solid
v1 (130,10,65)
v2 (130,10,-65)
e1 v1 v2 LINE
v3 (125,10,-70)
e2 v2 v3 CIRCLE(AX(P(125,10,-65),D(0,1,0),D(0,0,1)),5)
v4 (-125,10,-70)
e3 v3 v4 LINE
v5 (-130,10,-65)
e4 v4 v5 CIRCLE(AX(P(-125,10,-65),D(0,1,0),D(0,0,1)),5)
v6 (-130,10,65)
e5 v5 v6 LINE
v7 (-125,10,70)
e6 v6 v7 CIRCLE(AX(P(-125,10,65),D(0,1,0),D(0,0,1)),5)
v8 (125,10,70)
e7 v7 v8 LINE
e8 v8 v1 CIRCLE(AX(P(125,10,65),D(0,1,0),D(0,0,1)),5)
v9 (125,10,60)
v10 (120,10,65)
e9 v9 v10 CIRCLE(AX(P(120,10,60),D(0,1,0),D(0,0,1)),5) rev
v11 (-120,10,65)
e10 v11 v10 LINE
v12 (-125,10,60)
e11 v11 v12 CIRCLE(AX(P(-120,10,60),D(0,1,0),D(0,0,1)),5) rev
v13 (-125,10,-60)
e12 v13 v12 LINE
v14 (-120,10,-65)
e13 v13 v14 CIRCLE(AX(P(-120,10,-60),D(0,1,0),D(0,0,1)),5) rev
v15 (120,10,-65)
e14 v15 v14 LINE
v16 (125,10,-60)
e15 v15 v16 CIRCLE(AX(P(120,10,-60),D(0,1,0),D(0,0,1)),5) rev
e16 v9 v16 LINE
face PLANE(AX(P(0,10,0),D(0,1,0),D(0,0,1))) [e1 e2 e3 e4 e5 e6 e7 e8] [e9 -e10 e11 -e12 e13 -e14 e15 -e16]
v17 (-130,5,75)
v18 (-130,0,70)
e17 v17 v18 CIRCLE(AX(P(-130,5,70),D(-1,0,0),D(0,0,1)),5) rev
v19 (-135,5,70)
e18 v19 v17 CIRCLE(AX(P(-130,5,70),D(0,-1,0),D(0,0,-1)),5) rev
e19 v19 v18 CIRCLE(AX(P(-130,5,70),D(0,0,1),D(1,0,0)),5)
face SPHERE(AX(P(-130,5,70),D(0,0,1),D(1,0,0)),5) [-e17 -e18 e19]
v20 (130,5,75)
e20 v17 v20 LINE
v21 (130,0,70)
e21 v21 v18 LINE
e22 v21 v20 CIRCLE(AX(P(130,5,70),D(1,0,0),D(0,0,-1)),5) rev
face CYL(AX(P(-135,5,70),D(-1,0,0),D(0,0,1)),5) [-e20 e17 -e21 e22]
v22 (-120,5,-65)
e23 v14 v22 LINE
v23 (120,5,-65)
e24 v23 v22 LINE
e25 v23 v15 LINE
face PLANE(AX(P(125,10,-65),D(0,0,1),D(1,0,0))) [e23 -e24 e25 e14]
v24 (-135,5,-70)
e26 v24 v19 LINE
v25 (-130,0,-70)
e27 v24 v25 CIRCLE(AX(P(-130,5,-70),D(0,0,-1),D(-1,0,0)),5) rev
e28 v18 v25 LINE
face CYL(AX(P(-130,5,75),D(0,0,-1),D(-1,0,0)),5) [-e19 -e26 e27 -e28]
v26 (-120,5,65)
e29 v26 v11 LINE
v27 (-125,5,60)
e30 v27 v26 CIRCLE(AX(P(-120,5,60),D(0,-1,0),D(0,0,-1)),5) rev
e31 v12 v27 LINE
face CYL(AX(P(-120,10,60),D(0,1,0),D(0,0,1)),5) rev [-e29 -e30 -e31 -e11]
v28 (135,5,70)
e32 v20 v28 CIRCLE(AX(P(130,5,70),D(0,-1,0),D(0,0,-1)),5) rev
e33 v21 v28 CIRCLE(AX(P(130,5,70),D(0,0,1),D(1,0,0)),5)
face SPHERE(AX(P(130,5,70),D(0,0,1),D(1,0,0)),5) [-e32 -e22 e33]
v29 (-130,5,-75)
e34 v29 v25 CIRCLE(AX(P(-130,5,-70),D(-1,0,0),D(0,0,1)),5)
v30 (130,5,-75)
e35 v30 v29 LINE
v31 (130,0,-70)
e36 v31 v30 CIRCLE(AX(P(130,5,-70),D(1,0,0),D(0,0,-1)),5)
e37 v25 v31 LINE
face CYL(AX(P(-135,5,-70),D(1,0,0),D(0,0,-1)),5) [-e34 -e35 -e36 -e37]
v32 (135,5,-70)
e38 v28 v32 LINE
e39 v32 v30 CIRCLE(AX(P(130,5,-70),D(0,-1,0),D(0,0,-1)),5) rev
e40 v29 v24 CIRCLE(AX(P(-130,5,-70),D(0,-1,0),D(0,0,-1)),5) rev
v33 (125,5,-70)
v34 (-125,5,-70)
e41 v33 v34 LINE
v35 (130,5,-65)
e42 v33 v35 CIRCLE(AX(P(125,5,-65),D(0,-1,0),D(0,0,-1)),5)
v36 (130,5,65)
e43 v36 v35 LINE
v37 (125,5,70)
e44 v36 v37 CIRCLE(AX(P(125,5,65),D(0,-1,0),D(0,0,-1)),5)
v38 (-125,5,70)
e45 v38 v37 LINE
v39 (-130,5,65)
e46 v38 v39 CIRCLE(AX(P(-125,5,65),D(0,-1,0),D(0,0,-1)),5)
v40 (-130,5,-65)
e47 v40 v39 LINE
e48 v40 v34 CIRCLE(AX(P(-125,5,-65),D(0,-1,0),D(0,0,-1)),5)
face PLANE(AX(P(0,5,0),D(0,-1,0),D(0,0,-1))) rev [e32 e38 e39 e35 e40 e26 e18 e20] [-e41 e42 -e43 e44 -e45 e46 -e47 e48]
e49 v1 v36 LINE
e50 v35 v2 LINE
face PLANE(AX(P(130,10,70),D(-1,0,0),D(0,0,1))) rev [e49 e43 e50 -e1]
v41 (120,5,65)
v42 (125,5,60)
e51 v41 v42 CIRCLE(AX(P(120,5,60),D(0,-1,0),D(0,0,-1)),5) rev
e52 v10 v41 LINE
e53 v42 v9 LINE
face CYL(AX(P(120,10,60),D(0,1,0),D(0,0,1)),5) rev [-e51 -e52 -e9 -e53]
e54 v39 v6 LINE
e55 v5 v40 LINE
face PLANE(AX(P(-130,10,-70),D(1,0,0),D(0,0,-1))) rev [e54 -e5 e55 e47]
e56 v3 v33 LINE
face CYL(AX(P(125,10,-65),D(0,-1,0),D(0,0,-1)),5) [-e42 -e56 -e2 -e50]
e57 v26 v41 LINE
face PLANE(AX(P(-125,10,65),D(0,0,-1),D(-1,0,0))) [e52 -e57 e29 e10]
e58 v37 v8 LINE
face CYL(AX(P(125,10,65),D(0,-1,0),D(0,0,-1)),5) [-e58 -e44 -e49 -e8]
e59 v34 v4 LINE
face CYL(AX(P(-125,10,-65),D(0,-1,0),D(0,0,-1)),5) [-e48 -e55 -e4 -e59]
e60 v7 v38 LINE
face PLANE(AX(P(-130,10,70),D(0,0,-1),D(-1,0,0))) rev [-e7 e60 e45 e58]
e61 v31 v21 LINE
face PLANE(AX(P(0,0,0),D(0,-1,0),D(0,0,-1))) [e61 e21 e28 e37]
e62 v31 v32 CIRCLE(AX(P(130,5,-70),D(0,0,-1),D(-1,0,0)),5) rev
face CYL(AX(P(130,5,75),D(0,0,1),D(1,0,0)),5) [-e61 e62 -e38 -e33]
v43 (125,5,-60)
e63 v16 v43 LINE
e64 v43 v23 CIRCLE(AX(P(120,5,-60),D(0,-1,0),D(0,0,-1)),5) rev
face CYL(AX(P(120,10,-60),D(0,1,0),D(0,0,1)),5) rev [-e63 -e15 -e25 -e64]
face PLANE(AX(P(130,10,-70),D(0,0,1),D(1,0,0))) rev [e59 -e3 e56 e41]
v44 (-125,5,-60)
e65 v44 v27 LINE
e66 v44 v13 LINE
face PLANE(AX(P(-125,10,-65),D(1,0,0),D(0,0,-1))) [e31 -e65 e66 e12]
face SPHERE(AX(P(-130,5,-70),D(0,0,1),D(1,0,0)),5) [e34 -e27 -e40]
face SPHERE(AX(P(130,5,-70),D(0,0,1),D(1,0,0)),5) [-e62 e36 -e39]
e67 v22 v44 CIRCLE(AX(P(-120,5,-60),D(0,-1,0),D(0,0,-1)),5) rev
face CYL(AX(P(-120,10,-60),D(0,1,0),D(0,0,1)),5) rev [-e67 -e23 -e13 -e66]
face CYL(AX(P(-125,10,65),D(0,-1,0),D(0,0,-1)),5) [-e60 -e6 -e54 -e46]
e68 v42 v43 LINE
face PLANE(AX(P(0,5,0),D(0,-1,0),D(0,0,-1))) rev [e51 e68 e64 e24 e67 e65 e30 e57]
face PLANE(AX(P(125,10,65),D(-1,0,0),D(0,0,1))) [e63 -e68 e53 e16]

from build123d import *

# Parameters (mm, degrees)
SKETCH1_W           = 270
SKETCH1_H           = 150
BOSS_EXTRUDE2_DEPTH = 5
SKETCH4_W           = 260
SKETCH4_H           = 140
SKETCH4_W_2         = 250
SKETCH4_H_2         = 130
BOSS_EXTRUDE3_DEPTH = 5
FILLET1_R           = 5


with BuildPart() as part:
    # Sketch1 → Boss-Extrude2 (new body)
    with BuildSketch(Plane(origin=(0, 0, 0), x_dir=(1, 0, 0), z_dir=(0, 1, 0))):
        Rectangle(SKETCH1_W, SKETCH1_H)
    extrude(amount=BOSS_EXTRUDE2_DEPTH)

    # Sketch4 → Boss-Extrude3 (add)
    with BuildSketch(Plane(origin=(0, 5, 0), x_dir=(1, 0, 0), z_dir=(0, 1, 0))):
        Rectangle(SKETCH4_W, SKETCH4_H)
        Rectangle(SKETCH4_W_2, SKETCH4_H_2, mode=Mode.SUBTRACT)
    extrude(amount=BOSS_EXTRUDE3_DEPTH)

    # Fillet1
    fillet1_edges = [part.edges().sort_by_distance(p)[0] for p in [
        (-130, 7.5, 70),
        (130, 7.5, 70),
        (130, 7.5, -70),
        (-130, 7.5, -70),
        (-125, 7.5, -65),
        (-125, 7.5, 65),
        (125, 7.5, 65),
        (125, 7.5, -65),
        (0, 0, 75),
        (-135, 0, 0),
        (0, 0, -75),
        (135, 0, 0),
        (135, 2.5, 75),
        (-135, 2.5, 75),
        (-135, 2.5, -75),
        (135, 2.5, -75),
    ]]
    fillet(fillet1_edges, radius=FILLET1_R - 0.0001)  # a hair under: the kernel refuses the full size


solid = part.part
